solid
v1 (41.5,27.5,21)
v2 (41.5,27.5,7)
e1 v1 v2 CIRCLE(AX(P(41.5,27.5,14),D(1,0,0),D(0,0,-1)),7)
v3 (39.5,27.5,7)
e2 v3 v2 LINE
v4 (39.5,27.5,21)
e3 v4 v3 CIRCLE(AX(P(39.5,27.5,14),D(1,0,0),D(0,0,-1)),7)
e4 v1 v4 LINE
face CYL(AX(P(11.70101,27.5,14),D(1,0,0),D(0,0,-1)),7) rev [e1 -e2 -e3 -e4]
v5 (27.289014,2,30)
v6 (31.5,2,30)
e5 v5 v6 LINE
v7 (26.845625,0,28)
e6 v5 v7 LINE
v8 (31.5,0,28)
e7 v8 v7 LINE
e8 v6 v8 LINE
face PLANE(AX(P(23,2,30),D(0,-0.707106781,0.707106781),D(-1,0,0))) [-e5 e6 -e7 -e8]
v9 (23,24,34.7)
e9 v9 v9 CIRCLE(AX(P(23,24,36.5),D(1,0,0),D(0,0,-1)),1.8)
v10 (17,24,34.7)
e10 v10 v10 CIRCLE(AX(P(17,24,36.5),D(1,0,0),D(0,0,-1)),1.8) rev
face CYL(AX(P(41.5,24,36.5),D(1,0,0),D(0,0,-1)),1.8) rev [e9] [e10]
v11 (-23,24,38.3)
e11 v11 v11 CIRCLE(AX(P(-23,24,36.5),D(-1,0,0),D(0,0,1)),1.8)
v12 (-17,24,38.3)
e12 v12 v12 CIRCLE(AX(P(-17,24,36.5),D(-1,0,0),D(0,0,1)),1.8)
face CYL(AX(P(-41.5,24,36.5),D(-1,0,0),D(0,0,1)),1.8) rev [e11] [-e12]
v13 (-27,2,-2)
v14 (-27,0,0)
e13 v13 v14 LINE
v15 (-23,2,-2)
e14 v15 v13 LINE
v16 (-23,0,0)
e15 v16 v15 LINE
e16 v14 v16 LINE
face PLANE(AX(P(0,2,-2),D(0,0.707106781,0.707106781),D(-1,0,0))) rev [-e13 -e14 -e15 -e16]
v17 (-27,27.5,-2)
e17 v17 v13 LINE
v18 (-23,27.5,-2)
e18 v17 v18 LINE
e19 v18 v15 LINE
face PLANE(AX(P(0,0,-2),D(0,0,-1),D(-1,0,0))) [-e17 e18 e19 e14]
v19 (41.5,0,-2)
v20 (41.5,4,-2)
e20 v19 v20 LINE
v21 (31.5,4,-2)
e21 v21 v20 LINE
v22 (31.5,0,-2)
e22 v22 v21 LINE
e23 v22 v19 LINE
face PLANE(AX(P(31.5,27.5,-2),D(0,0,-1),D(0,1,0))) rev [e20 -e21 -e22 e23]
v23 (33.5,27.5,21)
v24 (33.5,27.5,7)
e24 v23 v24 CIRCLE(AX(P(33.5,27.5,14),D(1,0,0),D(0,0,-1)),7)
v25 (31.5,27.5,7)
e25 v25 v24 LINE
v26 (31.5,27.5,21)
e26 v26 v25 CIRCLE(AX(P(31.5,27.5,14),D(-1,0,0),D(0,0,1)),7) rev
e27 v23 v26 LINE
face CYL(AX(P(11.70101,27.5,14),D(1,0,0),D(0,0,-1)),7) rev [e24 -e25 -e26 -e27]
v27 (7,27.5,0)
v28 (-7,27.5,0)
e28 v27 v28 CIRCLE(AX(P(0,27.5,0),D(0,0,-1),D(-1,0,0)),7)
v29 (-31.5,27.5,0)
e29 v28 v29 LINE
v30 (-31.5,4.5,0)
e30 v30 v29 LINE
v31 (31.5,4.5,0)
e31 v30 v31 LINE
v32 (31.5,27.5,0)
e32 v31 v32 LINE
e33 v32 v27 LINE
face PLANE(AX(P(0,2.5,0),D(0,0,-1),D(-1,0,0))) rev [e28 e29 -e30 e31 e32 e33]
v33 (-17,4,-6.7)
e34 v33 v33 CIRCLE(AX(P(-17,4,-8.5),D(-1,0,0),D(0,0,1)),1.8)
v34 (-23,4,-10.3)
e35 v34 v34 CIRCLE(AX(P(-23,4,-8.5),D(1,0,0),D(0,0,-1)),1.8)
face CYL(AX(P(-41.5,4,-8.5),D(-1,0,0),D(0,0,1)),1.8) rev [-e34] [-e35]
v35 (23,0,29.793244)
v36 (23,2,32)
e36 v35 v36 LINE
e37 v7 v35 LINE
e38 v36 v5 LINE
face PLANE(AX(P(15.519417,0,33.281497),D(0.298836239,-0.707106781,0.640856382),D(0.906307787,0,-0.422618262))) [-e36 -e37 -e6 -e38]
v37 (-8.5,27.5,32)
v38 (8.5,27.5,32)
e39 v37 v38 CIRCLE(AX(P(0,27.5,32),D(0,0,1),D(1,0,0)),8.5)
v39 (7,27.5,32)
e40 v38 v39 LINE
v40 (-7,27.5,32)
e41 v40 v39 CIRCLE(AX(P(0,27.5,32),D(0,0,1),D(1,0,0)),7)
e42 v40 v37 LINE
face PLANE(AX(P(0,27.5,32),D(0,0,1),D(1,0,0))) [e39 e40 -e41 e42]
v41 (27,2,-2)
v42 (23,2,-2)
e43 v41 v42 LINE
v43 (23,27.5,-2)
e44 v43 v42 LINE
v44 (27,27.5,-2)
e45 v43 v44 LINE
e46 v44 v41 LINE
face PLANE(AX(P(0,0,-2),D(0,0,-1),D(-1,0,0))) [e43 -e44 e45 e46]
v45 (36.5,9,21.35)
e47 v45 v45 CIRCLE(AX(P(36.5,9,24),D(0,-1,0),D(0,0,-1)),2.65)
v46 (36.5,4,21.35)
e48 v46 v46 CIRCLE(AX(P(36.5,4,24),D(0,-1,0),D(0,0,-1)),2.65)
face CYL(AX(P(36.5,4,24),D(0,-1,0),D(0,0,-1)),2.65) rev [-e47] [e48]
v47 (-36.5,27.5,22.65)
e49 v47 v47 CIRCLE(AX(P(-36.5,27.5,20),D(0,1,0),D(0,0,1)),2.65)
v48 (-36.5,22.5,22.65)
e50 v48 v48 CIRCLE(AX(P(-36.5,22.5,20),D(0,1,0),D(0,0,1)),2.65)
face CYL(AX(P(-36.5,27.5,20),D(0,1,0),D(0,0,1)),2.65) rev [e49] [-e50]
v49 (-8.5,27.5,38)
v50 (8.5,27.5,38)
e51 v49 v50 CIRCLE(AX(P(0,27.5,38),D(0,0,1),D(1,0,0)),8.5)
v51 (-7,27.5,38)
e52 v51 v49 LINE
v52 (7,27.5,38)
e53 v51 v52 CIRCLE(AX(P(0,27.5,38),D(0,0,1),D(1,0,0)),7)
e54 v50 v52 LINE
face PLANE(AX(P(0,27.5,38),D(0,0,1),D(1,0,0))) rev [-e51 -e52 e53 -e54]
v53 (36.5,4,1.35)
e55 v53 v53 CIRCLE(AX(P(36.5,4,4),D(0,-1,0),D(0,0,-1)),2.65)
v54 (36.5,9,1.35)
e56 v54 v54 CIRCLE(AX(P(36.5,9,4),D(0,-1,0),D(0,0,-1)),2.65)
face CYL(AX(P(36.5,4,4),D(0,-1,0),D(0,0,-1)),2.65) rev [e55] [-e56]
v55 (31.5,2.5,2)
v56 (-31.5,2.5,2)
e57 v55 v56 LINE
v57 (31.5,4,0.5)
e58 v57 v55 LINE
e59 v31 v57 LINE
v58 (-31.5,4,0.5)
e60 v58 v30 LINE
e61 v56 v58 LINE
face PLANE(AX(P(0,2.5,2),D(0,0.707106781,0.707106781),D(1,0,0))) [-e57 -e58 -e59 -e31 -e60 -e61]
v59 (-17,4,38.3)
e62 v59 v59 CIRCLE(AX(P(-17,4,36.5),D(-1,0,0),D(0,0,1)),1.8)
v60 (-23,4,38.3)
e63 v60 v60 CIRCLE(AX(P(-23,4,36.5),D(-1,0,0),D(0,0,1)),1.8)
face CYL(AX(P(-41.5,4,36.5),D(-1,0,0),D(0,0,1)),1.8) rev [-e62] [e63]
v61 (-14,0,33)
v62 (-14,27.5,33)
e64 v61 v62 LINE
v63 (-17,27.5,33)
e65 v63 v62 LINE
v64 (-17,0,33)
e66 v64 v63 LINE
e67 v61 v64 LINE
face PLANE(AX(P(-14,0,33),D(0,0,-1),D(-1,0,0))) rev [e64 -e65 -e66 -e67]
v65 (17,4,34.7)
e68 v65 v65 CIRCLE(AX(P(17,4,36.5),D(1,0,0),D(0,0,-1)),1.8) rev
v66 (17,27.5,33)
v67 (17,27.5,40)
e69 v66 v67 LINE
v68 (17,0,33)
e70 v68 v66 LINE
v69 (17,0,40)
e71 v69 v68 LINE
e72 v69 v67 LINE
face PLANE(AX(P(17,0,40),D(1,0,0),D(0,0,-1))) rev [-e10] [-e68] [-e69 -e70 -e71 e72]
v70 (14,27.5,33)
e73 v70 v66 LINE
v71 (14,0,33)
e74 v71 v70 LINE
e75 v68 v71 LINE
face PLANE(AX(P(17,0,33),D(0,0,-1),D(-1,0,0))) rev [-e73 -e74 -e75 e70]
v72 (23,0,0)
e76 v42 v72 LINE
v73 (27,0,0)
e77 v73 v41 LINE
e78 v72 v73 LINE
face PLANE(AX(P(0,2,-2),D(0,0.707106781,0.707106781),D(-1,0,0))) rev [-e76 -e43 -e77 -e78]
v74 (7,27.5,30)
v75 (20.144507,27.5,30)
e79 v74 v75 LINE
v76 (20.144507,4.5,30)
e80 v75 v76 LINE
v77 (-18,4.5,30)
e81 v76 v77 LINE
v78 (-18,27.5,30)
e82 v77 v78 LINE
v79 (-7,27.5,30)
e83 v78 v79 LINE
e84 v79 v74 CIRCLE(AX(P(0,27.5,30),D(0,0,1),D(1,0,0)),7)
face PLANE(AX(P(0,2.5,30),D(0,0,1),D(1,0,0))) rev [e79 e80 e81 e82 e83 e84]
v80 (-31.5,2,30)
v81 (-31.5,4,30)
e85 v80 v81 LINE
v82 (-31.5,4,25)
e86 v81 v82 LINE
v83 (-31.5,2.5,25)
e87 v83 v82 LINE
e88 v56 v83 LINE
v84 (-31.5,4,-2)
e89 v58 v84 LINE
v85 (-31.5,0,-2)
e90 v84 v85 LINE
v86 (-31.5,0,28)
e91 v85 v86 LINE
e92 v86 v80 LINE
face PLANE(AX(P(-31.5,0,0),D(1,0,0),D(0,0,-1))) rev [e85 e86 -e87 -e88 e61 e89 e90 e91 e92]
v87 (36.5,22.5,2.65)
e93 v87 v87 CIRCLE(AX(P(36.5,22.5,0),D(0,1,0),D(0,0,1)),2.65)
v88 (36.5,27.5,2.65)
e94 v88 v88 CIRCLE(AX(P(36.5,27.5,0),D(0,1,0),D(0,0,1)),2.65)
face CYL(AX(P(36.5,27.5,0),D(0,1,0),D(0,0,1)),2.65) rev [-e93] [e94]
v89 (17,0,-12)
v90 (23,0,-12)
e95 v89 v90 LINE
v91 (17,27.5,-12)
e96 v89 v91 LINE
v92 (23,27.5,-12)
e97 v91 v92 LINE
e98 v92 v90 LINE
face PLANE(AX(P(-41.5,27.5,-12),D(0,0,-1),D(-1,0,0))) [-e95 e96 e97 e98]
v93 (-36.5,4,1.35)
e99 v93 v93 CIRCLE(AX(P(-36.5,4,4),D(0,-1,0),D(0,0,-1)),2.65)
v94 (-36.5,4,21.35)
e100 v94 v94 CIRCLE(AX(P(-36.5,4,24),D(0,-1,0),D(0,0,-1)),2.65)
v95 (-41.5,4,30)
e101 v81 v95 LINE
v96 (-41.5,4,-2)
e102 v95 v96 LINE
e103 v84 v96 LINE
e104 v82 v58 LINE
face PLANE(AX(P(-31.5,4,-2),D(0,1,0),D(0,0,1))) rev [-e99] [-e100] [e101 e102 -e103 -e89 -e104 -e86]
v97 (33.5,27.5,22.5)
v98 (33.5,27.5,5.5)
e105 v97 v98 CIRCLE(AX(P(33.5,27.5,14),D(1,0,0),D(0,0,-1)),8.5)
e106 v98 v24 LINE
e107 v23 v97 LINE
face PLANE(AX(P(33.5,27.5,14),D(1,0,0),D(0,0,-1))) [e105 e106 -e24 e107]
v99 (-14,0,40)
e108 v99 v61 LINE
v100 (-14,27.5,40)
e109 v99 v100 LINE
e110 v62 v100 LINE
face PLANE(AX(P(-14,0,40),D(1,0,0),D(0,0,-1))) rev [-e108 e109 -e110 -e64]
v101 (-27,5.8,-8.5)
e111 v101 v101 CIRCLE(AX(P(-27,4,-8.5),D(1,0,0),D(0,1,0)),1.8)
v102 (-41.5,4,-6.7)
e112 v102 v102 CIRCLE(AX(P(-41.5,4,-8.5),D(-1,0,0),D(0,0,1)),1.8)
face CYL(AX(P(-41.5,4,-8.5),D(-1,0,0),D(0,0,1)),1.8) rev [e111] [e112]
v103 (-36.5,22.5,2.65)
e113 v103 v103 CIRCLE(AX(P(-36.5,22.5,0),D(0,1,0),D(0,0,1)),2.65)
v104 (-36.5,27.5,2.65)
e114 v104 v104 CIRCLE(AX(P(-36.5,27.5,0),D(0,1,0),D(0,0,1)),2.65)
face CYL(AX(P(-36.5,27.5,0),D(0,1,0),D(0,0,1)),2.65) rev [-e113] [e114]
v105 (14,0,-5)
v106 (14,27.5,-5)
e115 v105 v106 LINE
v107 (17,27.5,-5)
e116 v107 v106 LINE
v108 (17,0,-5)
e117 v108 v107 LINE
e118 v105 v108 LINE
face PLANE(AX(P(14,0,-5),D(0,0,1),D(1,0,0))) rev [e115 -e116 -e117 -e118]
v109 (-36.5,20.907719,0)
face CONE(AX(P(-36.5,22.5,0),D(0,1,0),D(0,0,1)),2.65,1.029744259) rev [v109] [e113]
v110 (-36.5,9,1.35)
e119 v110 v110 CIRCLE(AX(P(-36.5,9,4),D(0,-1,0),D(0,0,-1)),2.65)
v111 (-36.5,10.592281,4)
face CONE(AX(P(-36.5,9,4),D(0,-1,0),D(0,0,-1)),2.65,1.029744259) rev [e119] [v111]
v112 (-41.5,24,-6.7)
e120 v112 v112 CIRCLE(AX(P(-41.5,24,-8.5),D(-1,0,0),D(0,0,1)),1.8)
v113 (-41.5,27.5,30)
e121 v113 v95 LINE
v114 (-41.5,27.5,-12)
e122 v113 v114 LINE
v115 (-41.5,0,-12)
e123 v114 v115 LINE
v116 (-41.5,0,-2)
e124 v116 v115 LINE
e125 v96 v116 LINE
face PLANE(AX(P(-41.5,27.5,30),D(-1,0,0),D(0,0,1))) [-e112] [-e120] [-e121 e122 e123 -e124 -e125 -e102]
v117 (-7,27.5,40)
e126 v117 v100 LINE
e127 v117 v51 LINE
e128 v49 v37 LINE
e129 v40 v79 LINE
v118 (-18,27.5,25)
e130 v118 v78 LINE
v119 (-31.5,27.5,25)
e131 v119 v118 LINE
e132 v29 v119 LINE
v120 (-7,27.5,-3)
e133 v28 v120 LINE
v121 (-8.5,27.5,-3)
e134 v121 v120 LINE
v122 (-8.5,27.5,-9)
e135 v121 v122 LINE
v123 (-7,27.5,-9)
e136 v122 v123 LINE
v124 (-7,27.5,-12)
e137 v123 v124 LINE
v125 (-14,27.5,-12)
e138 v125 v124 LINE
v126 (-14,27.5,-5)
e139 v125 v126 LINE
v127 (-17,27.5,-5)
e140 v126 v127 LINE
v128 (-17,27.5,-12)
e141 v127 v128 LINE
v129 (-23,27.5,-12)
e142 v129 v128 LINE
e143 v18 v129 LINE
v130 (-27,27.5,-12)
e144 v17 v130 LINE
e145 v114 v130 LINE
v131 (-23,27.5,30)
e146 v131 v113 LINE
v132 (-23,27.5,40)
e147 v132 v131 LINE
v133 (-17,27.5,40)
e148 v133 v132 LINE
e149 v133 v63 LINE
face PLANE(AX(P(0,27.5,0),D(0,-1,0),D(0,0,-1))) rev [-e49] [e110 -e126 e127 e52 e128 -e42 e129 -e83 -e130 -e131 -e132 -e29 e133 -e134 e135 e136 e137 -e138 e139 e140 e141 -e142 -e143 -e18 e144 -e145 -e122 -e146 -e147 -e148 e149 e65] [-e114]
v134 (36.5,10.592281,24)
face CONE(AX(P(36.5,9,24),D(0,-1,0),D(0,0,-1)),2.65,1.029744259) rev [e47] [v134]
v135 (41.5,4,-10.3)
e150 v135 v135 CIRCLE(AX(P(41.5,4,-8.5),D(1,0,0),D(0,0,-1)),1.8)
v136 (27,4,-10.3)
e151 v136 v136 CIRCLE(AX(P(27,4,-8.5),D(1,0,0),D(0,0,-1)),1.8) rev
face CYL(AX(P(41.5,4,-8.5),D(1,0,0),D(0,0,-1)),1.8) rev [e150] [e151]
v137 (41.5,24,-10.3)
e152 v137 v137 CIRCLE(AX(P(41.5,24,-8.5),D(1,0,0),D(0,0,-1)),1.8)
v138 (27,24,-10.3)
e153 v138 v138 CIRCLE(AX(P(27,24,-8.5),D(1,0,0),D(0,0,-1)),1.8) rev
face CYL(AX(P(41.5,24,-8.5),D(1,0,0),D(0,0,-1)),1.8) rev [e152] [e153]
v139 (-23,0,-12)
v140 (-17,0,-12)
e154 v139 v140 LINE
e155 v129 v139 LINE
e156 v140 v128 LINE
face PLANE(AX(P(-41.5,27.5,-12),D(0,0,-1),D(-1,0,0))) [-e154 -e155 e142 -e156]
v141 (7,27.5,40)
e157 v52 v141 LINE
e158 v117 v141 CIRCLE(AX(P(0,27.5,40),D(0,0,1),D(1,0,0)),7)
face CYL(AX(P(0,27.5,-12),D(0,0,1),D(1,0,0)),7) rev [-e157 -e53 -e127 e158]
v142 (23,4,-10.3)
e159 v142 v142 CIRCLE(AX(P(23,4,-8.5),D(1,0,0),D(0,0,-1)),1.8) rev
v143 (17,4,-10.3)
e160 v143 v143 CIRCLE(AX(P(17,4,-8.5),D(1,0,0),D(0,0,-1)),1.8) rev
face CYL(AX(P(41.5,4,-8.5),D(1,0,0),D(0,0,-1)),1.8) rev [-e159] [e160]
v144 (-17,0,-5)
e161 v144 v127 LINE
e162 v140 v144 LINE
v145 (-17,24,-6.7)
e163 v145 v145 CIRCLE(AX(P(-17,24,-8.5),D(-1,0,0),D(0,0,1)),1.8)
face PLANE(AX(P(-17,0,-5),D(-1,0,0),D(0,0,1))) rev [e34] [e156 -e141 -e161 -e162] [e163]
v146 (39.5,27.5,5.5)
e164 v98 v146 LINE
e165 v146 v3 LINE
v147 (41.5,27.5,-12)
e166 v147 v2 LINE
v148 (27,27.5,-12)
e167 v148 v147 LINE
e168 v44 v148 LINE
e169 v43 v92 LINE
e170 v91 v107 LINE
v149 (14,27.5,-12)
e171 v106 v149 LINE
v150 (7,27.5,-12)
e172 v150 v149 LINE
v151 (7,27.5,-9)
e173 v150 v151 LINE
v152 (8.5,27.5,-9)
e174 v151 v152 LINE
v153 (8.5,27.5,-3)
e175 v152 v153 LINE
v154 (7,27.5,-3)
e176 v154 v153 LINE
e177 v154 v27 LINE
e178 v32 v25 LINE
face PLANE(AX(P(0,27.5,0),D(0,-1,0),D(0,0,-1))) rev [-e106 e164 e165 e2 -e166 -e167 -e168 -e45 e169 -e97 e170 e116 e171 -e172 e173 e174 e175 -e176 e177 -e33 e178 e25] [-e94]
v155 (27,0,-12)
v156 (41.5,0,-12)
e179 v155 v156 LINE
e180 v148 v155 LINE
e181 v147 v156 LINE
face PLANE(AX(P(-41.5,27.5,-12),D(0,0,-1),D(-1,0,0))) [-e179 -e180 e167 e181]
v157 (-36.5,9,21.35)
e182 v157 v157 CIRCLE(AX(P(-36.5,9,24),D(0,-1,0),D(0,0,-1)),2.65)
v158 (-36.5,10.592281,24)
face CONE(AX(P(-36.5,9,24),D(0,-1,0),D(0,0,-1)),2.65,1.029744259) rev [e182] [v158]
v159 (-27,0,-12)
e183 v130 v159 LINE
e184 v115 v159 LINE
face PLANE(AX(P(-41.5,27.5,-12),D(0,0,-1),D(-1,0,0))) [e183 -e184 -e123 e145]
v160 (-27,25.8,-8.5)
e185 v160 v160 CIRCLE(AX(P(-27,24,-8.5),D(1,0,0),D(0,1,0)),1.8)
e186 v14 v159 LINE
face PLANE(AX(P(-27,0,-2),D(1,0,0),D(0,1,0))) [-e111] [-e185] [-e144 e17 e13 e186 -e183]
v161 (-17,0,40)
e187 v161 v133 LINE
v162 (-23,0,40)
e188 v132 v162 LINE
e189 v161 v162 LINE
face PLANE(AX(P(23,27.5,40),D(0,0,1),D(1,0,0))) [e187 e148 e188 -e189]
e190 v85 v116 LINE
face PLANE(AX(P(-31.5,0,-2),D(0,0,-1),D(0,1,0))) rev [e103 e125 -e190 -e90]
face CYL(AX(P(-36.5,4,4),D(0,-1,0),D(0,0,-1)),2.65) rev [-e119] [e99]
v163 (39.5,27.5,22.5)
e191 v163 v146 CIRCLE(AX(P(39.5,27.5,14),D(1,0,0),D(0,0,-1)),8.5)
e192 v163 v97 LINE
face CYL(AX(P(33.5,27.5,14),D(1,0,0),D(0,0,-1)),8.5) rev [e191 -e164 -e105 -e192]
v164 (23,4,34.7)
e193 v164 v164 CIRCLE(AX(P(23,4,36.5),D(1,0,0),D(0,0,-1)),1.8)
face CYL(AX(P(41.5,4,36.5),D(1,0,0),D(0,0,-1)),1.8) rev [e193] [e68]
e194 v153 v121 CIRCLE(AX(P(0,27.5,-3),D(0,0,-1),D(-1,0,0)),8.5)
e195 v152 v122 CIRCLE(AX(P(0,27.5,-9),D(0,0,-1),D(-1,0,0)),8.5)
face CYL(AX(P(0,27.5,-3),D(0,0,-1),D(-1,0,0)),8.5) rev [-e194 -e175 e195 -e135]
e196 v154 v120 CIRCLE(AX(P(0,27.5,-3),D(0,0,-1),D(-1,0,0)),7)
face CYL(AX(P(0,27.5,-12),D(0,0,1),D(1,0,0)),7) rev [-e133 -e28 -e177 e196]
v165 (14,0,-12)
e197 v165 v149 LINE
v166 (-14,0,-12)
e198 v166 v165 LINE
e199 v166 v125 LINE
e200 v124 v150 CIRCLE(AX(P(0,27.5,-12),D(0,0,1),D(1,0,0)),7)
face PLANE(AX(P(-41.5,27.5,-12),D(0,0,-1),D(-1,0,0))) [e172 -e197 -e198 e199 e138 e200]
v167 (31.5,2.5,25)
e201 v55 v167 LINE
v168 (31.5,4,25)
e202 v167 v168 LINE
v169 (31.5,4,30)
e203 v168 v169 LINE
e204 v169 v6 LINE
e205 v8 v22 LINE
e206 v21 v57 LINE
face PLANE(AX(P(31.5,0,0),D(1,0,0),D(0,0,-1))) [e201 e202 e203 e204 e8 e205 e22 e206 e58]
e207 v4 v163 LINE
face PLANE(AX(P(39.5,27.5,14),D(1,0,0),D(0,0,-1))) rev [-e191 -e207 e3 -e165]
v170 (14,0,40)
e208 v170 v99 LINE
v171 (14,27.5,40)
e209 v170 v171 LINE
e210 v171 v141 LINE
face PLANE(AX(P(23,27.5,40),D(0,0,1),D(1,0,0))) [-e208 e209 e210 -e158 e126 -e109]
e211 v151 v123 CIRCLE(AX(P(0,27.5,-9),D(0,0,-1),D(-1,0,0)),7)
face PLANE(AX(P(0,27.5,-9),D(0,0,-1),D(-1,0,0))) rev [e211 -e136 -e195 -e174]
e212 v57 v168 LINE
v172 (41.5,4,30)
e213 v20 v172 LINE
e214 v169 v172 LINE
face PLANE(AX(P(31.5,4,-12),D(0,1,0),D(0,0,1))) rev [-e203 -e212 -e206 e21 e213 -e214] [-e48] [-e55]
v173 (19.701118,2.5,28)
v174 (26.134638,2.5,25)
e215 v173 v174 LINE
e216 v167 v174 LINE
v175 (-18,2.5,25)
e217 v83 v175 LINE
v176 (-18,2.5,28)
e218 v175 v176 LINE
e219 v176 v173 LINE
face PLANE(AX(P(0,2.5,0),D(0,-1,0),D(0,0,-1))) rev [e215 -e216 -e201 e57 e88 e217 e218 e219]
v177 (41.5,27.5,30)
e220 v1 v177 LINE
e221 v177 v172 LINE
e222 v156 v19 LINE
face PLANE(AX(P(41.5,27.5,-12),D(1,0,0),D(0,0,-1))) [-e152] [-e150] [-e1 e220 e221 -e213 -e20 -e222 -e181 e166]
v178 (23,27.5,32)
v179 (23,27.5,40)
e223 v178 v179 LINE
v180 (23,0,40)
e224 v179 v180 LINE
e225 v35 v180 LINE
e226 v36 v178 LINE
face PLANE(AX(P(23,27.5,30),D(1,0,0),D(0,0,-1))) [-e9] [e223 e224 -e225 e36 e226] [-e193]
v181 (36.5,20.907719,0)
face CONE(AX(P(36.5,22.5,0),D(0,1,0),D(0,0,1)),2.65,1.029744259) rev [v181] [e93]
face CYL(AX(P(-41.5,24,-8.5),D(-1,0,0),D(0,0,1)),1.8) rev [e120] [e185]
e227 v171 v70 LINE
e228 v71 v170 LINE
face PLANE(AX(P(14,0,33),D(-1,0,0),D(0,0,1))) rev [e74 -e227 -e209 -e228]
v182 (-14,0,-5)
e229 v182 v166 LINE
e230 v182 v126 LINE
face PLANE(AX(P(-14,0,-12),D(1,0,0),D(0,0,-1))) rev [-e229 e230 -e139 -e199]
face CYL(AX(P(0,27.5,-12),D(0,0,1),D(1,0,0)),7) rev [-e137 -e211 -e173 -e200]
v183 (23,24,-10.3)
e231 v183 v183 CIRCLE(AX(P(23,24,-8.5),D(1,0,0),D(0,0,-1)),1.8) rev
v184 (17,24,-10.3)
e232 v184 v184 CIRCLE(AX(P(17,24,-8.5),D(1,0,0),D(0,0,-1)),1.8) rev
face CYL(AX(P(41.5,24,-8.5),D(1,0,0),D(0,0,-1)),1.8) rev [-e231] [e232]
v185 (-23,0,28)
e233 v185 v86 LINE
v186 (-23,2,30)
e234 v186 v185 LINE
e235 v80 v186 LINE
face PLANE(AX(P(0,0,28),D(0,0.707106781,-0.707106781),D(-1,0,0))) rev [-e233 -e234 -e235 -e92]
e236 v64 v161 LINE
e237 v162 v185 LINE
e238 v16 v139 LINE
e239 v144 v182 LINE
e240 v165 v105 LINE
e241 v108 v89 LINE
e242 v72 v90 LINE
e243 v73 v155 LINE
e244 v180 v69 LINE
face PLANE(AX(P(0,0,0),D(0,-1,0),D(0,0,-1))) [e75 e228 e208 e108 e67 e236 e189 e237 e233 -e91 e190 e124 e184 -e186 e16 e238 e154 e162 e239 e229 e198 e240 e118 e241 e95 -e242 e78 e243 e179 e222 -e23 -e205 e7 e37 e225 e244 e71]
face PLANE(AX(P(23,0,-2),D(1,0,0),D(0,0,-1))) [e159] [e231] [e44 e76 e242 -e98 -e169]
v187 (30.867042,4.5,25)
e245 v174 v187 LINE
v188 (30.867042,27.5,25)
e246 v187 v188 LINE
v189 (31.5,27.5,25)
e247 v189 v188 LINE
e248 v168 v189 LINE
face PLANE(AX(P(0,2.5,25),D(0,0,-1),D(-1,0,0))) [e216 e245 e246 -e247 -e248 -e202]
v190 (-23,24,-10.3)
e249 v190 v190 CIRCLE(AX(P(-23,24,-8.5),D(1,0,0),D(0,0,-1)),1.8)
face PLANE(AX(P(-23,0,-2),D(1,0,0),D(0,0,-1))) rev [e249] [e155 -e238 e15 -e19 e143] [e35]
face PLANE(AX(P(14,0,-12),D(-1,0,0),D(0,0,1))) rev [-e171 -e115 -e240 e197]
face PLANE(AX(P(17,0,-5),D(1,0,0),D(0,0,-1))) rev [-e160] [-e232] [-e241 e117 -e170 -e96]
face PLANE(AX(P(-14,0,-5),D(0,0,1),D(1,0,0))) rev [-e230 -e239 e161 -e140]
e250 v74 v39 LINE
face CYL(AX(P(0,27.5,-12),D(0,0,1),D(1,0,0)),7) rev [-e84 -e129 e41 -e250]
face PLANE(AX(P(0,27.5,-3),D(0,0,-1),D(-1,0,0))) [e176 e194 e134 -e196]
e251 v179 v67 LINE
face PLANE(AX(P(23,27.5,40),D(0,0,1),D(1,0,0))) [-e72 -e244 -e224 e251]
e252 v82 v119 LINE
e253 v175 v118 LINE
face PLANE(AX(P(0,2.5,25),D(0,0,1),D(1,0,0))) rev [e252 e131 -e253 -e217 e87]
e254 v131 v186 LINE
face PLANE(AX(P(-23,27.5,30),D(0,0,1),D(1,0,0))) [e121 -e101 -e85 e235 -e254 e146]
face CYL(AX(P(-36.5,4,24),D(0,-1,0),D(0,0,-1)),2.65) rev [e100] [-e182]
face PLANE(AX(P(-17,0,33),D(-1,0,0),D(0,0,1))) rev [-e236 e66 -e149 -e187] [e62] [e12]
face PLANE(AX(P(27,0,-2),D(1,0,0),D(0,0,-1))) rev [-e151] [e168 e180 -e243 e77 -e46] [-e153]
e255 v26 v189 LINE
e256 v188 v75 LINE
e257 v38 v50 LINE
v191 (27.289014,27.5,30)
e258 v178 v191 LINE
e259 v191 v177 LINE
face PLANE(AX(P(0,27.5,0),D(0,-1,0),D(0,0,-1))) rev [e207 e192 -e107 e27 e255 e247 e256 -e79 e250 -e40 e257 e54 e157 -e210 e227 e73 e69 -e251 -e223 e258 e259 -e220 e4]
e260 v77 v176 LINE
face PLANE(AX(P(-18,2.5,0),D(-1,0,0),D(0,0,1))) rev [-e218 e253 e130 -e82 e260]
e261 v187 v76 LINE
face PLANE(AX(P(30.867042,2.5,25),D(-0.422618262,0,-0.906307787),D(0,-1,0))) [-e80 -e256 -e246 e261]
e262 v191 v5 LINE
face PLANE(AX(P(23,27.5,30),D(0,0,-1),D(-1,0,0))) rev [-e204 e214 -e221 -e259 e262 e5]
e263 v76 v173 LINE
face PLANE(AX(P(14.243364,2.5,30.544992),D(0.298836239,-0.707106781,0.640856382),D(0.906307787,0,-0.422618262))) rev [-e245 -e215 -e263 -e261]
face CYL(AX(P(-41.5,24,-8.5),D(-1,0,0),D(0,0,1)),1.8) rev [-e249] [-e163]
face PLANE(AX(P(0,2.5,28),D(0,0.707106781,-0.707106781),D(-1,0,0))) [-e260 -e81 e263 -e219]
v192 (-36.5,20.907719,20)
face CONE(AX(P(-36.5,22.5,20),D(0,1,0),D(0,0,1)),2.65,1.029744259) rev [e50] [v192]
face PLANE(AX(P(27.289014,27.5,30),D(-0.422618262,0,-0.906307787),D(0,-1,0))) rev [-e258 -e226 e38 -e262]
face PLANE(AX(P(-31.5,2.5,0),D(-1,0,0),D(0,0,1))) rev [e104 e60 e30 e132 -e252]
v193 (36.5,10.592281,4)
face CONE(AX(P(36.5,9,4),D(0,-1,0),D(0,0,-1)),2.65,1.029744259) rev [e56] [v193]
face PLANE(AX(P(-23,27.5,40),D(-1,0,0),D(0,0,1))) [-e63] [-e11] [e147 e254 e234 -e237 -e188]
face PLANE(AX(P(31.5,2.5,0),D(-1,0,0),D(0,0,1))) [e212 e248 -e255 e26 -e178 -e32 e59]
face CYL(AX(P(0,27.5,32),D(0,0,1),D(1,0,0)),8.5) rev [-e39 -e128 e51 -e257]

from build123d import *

# Parameters (mm, degrees)
BOSS_EXTRUDE1_DEPTH            = 27.5
CUT_EXTRUDE2_START             = 27.5
CUT_EXTRUDE2_DEPTH             = 25
CUT_EXTRUDE3_START             = -2
SKETCH3_R                      = 8.5
CUT_EXTRUDE3_DEPTH             = 6
CUT_EXTRUDE4_START             = -9
SKETCH4_R                      = 8.5
CUT_EXTRUDE4_DEPTH             = 6
CUT_EXTRUDE6_DEPTH             = 72.98958258
M3_CLEARANCE_HOLE1_D           = 3.6
M3_CLEARANCE_HOLE1_DEPTH       = 26.4
M3_CLEARANCE_HOLE1_TIP         = 1.081549114
SKETCH16_W                     = 4
SKETCH16_H                     = 27.5
CUT_EXTRUDE7_DEPTH             = 10
CUT_EXTRUDE8_START             = -2
SKETCH17_R                     = 8.5
CUT_EXTRUDE8_DEPTH             = 6
CUT_EXTRUDE9_REACH             = 98.152
CHAMFER1_SIZE                  = 2
CHAMFER1_SIZE2                 = 4.289013841
CHAMFER2_SIZE                  = 6
CHAMFER2_SIZE_2                = 12.867041523
CUT_EXTRUDE10_DEPTH            = 64.863134906
CUT_EXTRUDE10_DEPTH_BACK       = 64.863134906
SKETCH18_W                     = 3
SKETCH18_H                     = 7
SKETCH19_W                     = 32
SKETCH19_H                     = 4
CUT_EXTRUDE12_DEPTH            = 10
CUT_EXTRUDE13_START            = -83
SKETCH19_2_W                   = 32
SKETCH19_2_H                   = 4
CUT_EXTRUDE13_DEPTH            = 10
F_5_3_5_3_DIAMETER_HOLE1_D     = 5.3
F_5_3_5_3_DIAMETER_HOLE1_DEPTH = 5
F_5_3_5_3_DIAMETER_HOLE1_TIP   = 1.59228064
F_5_3_5_3_DIAMETER_HOLE2_D     = 5.3
F_5_3_5_3_DIAMETER_HOLE2_DEPTH = 5
F_5_3_5_3_DIAMETER_HOLE2_TIP   = 1.59228064
M3_CLEARANCE_HOLE2_D           = 3.6
M3_CLEARANCE_HOLE2_DEPTH       = 26.4
M3_CLEARANCE_HOLE2_TIP         = 1.081549114
CHAMFER3_SIZE                  = 2
CHAMFER4_SIZE                  = 2
CHAMFER5_SIZE                  = 2


with BuildPart() as part:
    # Sketch1 → Boss-Extrude1 (new body)
    with BuildSketch(Plane(origin=(0, 0, 0), x_dir=(1, 0, 0), z_dir=(0, 1, 0))):
        Polygon((-41.5, 12), (41.5, 12), (41.5, -30), (23, -30), (23, -40), (-23, -40), (-23, -30), (-41.5, -30), align=None)
    extrude(amount=BOSS_EXTRUDE1_DEPTH)

    # Sketch1<4> → Cut-Extrude2 (cut)
    with BuildSketch(Plane(origin=(0, 0, 0), x_dir=(1, 0, 0), z_dir=(0, 1, 0)).offset(CUT_EXTRUDE2_START)):
        Polygon((31.5, 0), (-31.5, 0), (-31.5, -25), (-18, -25), (-18, -30), (18, -30), (18, -25), (31.5, -25), (31.5, -10), align=None)
    extrude(amount=-CUT_EXTRUDE2_DEPTH, mode=Mode.SUBTRACT)

    # Sketch3 → Cut-Extrude3 (cut)
    with BuildSketch(Plane.XY.offset(40).offset(CUT_EXTRUDE3_START)):
        with Locations((0, 27.5)):
            Circle(SKETCH3_R)
    extrude(amount=-CUT_EXTRUDE3_DEPTH, mode=Mode.SUBTRACT)

    # Sketch4 → Cut-Extrude4 (cut)
    with BuildSketch(Plane(origin=(0, 0, -12), x_dir=(-1, 0, 0), z_dir=(0, 0, -1)).offset(CUT_EXTRUDE4_START)):
        with Locations((0, 27.5)):
            Circle(SKETCH4_R)
    extrude(amount=CUT_EXTRUDE4_DEPTH, mode=Mode.SUBTRACT)

    # Sketch3<4> → Cut-Extrude6 (cut, through all)
    with BuildSketch(Plane.XY.offset(40)):
        with BuildLine():
            Line((-7, 27.5), (7, 27.5))
            ThreePointArc((7, 27.5), (0, 34.5), (-7, 27.5))
        make_face()
        with BuildLine():
            ThreePointArc((-7, 27.5), (0, 20.5), (7, 27.5))
            Line((7, 27.5), (-7, 27.5))
        make_face()
        with BuildLine():
            Line((-7, 27.5), (7, 27.5))
            ThreePointArc((7, 27.5), (0, 34.5), (-7, 27.5))
        make_face()
        with BuildLine():
            ThreePointArc((-7, 27.5), (0, 20.5), (7, 27.5))
            Line((7, 27.5), (-7, 27.5))
        make_face()
    extrude(amount=-CUT_EXTRUDE6_DEPTH, mode=Mode.SUBTRACT)

    # M3 Clearance Hole1
    with Locations(Plane(origin=(41.5, 0, 0), x_dir=(0, 0, -1), z_dir=(1, 0, 0))):
        with Locations((8.5, 4), (-36.5, 4), (8.5, 24), (-36.5, 24)):
            Hole(M3_CLEARANCE_HOLE1_D / 2, depth=M3_CLEARANCE_HOLE1_DEPTH)
            with Locations((0, 0, -(M3_CLEARANCE_HOLE1_DEPTH + M3_CLEARANCE_HOLE1_TIP / 2))):  # 118° drill point
                Cone(0, M3_CLEARANCE_HOLE1_D / 2, M3_CLEARANCE_HOLE1_TIP, mode=Mode.SUBTRACT)

    # Sketch16 → Cut-Extrude7 (cut)
    with BuildSketch(Plane(origin=(0, 0, -12), x_dir=(-1, 0, 0), z_dir=(0, 0, -1))):
        with Locations((25, 13.75)):
            Rectangle(SKETCH16_W, SKETCH16_H)
        with Locations((-25, 13.75)):
            Rectangle(SKETCH16_W, SKETCH16_H)
    extrude(amount=-CUT_EXTRUDE7_DEPTH, mode=Mode.SUBTRACT)

    # Sketch17 → Cut-Extrude8 (cut)
    with BuildSketch(Plane(origin=(41.5, 0, 0), x_dir=(0, 0, -1), z_dir=(1, 0, 0)).offset(CUT_EXTRUDE8_START)):
        with Locations((-14, 27.5)):
            Circle(SKETCH17_R)
    extrude(amount=-CUT_EXTRUDE8_DEPTH, mode=Mode.SUBTRACT)

    # Cut-Extrude9: up to this face of the body (flat: up to its plane)
    cut_extrude9_end = Plane(part.part.faces().sort_by_distance((31.5, 15, 12.5))[0])
    # Sketch17<3> → Cut-Extrude9 (cut, up to the picked face)
    with BuildSketch(Plane(origin=(41.5, 0, 0), x_dir=(0, 0, -1), z_dir=(1, 0, 0)), mode=Mode.PRIVATE) as cut_extrude9_sk1:
        with BuildLine():
            Line((-21, 27.5), (-7, 27.5))
            ThreePointArc((-7, 27.5), (-14, 34.5), (-21, 27.5))
        make_face()
    cut_extrude9_tool1 = split(extrude(cut_extrude9_sk1.sketch, amount=-CUT_EXTRUDE9_REACH, mode=Mode.PRIVATE), bisect_by=cut_extrude9_end, keep=Keep.BOTH, mode=Mode.PRIVATE)
    # Sketch17<3> → Cut-Extrude9 (cut, up to the picked face)
    with BuildSketch(Plane(origin=(41.5, 0, 0), x_dir=(0, 0, -1), z_dir=(1, 0, 0)), mode=Mode.PRIVATE) as cut_extrude9_sk2:
        with BuildLine():
            ThreePointArc((-21, 27.5), (-14, 20.5), (-7, 27.5))
            Line((-7, 27.5), (-21, 27.5))
        make_face()
    cut_extrude9_tool2 = split(extrude(cut_extrude9_sk2.sketch, amount=-CUT_EXTRUDE9_REACH, mode=Mode.PRIVATE), bisect_by=cut_extrude9_end, keep=Keep.BOTH, mode=Mode.PRIVATE)
    # Sketch17<3> → Cut-Extrude9 (cut, up to the picked face)
    with BuildSketch(Plane(origin=(41.5, 0, 0), x_dir=(0, 0, -1), z_dir=(1, 0, 0)), mode=Mode.PRIVATE) as cut_extrude9_sk3:
        with BuildLine():
            Line((-21, 27.5), (-7, 27.5))
            ThreePointArc((-7, 27.5), (-14, 34.5), (-21, 27.5))
        make_face()
    cut_extrude9_tool3 = split(extrude(cut_extrude9_sk3.sketch, amount=-CUT_EXTRUDE9_REACH, mode=Mode.PRIVATE), bisect_by=cut_extrude9_end, keep=Keep.BOTH, mode=Mode.PRIVATE)
    # Sketch17<3> → Cut-Extrude9 (cut, up to the picked face)
    with BuildSketch(Plane(origin=(41.5, 0, 0), x_dir=(0, 0, -1), z_dir=(1, 0, 0)), mode=Mode.PRIVATE) as cut_extrude9_sk4:
        with BuildLine():
            ThreePointArc((-21, 27.5), (-14, 20.5), (-7, 27.5))
            Line((-7, 27.5), (-21, 27.5))
        make_face()
    cut_extrude9_tool4 = split(extrude(cut_extrude9_sk4.sketch, amount=-CUT_EXTRUDE9_REACH, mode=Mode.PRIVATE), bisect_by=cut_extrude9_end, keep=Keep.BOTH, mode=Mode.PRIVATE)
    add(cut_extrude9_tool1.solids().sort_by(Axis((41.5, 30.470892, 14), (-1, 0, 0)))[0], mode=Mode.SUBTRACT)
    add(cut_extrude9_tool2.solids().sort_by(Axis((41.5, 24.529108, 14), (-1, 0, 0)))[0], mode=Mode.SUBTRACT)
    add(cut_extrude9_tool3.solids().sort_by(Axis((41.5, 30.470892, 14), (-1, 0, 0)))[0], mode=Mode.SUBTRACT)
    add(cut_extrude9_tool4.solids().sort_by(Axis((41.5, 24.529108, 14), (-1, 0, 0)))[0], mode=Mode.SUBTRACT)

    # Chamfer1
    chamfer1_edges = [part.edges().sort_by_distance(p)[0] for p in [
        (23, 13.75, 30),
    ]]
    chamfer1_side = [part.faces().sort_by_distance(p)[0] for p in [
        (23, 13.730013625, 34.88008175),
    ]]
    chamfer(chamfer1_edges, length=CHAMFER1_SIZE, length2=CHAMFER1_SIZE2, reference=chamfer1_side[0])

    # Chamfer2
    # the kernel refuses this chamfer: 12.867041523, 6 mm, written as the material it takes off along each edge
    with BuildSketch(Plane(origin=(18, 60.838188976, 25), x_dir=(-0.07481330637059953, 0, 0.9971975577536775), z_dir=(0, -1, 0))) as chamfer2_piece_1_section:
        Polygon((CHAMFER2_SIZE * 0.997197557754, -CHAMFER2_SIZE * 0.0748133063706), (-CHAMFER2_SIZE_2 * 0.0748133063709, -CHAMFER2_SIZE_2 * 0.997197557758), (0, 0), align=None)
    chamfer2_piece_1 = extrude(amount=58.338188976, mode=Mode.PRIVATE)
    chamfer2_piece_1 = split(chamfer2_piece_1, bisect_by=Plane(origin=(22.391133218, 15, 30), z_dir=(0, 0, -1)), keep=Keep.TOP, mode=Mode.PRIVATE)
    add(chamfer2_piece_1, mode=Mode.SUBTRACT)

    # Sketch18 → Cut-Extrude10 (cut, two sides: drawn at the far end of the back side and taken through both)
    with BuildSketch(Plane(origin=(0, 27.5, 0), x_dir=(1, 0, 0), z_dir=(0, 1, 0)).offset(-CUT_EXTRUDE10_DEPTH_BACK)):
        with Locations((-15.5, 8.5)):
            Rectangle(SKETCH18_W, SKETCH18_H)
        with Locations((15.5, 8.5)):
            Rectangle(SKETCH18_W, SKETCH18_H)
        with Locations((-15.5, -36.5)):
            Rectangle(SKETCH18_W, SKETCH18_H)
        with Locations((15.5, -36.5)):
            Rectangle(SKETCH18_W, SKETCH18_H)
    extrude(amount=CUT_EXTRUDE10_DEPTH + CUT_EXTRUDE10_DEPTH_BACK, mode=Mode.SUBTRACT)

    # Sketch19 → Cut-Extrude12 (cut)
    with BuildSketch(Plane.ZY.offset(41.5)):
        with Locations((14, 2)):
            Rectangle(SKETCH19_W, SKETCH19_H)
    extrude(amount=-CUT_EXTRUDE12_DEPTH, mode=Mode.SUBTRACT)

    # Sketch19<2> → Cut-Extrude13 (cut)
    with BuildSketch(Plane.ZY.offset(41.5).offset(CUT_EXTRUDE13_START)):
        with Locations((14, 2)):
            Rectangle(SKETCH19_2_W, SKETCH19_2_H)
    extrude(amount=CUT_EXTRUDE13_DEPTH, mode=Mode.SUBTRACT)

    # Ø5.3 (5.3) Diameter Hole1
    with Locations(Plane(origin=(0, 4, 0), x_dir=(-1, 0, 0), z_dir=(0, -1, 0))):
        with Locations((36.5, -24), (36.5, -4), (-36.5, -24), (-36.5, -4)):
            Hole(F_5_3_5_3_DIAMETER_HOLE1_D / 2, depth=F_5_3_5_3_DIAMETER_HOLE1_DEPTH)
            with Locations((0, 0, -(F_5_3_5_3_DIAMETER_HOLE1_DEPTH + F_5_3_5_3_DIAMETER_HOLE1_TIP / 2))):  # 118° drill point
                Cone(0, F_5_3_5_3_DIAMETER_HOLE1_D / 2, F_5_3_5_3_DIAMETER_HOLE1_TIP, mode=Mode.SUBTRACT)

    # Ø5.3 (5.3) Diameter Hole2
    with Locations(Plane(origin=(0, 27.5, 0), x_dir=(1, 0, 0), z_dir=(0, 1, 0))):
        with Locations((-36.5, 0), (-36.5, -20), (36.5, 0)):
            Hole(F_5_3_5_3_DIAMETER_HOLE2_D / 2, depth=F_5_3_5_3_DIAMETER_HOLE2_DEPTH)
            with Locations((0, 0, -(F_5_3_5_3_DIAMETER_HOLE2_DEPTH + F_5_3_5_3_DIAMETER_HOLE2_TIP / 2))):  # 118° drill point
                Cone(0, F_5_3_5_3_DIAMETER_HOLE2_D / 2, F_5_3_5_3_DIAMETER_HOLE2_TIP, mode=Mode.SUBTRACT)

    # M3 Clearance Hole2
    with Locations(Plane.ZY.offset(41.5)):
        with Locations((-8.5, 24), (36.5, 24), (36.5, 4), (-8.5, 4)):
            Hole(M3_CLEARANCE_HOLE2_D / 2, depth=M3_CLEARANCE_HOLE2_DEPTH)
            with Locations((0, 0, -(M3_CLEARANCE_HOLE2_DEPTH + M3_CLEARANCE_HOLE2_TIP / 2))):  # 118° drill point
                Cone(0, M3_CLEARANCE_HOLE2_D / 2, M3_CLEARANCE_HOLE2_TIP, mode=Mode.SUBTRACT)

    # Chamfer3
    # the kernel refuses this chamfer: 2 mm, written as the material it adds along each edge
    with BuildSketch(Plane(origin=(25.287872896, 2.5, 30), x_dir=(0, -0.027495876610586296, -0.9996219169112968), z_dir=(-1, 0, 0))) as chamfer3_piece_1:
        Polygon((CHAMFER3_SIZE * 0.999621916911, -CHAMFER3_SIZE * 0.0274958766106), (-CHAMFER3_SIZE * 0.0274958766106, -CHAMFER3_SIZE * 0.999621916911), (0, 0), align=None)
    extrude(amount=48.431238872)
    with BuildSketch(Plane(origin=(31.5, 2.5, 0), x_dir=(0, -0.027495876610586275, 0.9996219169112968), z_dir=(-1, 0, 0))) as chamfer3_piece_2:
        Polygon((CHAMFER3_SIZE * 0.999621916911, CHAMFER3_SIZE * 0.0274958766106), (-CHAMFER3_SIZE * 0.0274958766106, CHAMFER3_SIZE * 0.999621916911), (0, 0), align=None)
    extrude(amount=63)
    # the kernel refuses this chamfer: 2 mm, written as the material it takes off along each edge
    with BuildSketch(Plane(origin=(27, 0, -2), x_dir=(0, -0.027495876610586355, 0.9996219169112968), z_dir=(-1, 0, 0)), Plane(origin=(-23, 0, -2), x_dir=(0, -0.027495876610586382, 0.9996219169112968), z_dir=(-1, 0, 0))) as chamfer3_2_piece_1:
        Polygon((CHAMFER3_SIZE * 0.999621916911, CHAMFER3_SIZE * 0.0274958766106), (-CHAMFER3_SIZE * 0.0274958766106, CHAMFER3_SIZE * 0.999621916911), (0, 0), align=None)
    extrude(amount=4, mode=Mode.SUBTRACT)
    with BuildSketch(Plane(origin=(-23, 0, 30), x_dir=(0, -0.02749587661058639, -0.9996219169112968), z_dir=(-1, 0, 0))) as chamfer3_2_piece_2:
        Polygon((CHAMFER3_SIZE * 0.999621916911, -CHAMFER3_SIZE * 0.0274958766106), (-CHAMFER3_SIZE * 0.0274958766106, -CHAMFER3_SIZE * 0.999621916911), (0, 0), align=None)
    extrude(amount=13.643365976, mode=Mode.SUBTRACT)

    # Chamfer4
    chamfer4_edges = [part.edges().sort_by_distance(p)[0] for p in [
        (27.650281142, 2.5, 26.5),
    ]]
    chamfer(chamfer4_edges, length=CHAMFER4_SIZE)

    # Chamfer5
    chamfer5_edges = [part.edges().sort_by_distance(p)[0] for p in [
        (29.394506921, 0, 30),
        (25.144506921, 0, 31),
    ]]
    chamfer(chamfer5_edges, length=CHAMFER5_SIZE)


solid = part.part
